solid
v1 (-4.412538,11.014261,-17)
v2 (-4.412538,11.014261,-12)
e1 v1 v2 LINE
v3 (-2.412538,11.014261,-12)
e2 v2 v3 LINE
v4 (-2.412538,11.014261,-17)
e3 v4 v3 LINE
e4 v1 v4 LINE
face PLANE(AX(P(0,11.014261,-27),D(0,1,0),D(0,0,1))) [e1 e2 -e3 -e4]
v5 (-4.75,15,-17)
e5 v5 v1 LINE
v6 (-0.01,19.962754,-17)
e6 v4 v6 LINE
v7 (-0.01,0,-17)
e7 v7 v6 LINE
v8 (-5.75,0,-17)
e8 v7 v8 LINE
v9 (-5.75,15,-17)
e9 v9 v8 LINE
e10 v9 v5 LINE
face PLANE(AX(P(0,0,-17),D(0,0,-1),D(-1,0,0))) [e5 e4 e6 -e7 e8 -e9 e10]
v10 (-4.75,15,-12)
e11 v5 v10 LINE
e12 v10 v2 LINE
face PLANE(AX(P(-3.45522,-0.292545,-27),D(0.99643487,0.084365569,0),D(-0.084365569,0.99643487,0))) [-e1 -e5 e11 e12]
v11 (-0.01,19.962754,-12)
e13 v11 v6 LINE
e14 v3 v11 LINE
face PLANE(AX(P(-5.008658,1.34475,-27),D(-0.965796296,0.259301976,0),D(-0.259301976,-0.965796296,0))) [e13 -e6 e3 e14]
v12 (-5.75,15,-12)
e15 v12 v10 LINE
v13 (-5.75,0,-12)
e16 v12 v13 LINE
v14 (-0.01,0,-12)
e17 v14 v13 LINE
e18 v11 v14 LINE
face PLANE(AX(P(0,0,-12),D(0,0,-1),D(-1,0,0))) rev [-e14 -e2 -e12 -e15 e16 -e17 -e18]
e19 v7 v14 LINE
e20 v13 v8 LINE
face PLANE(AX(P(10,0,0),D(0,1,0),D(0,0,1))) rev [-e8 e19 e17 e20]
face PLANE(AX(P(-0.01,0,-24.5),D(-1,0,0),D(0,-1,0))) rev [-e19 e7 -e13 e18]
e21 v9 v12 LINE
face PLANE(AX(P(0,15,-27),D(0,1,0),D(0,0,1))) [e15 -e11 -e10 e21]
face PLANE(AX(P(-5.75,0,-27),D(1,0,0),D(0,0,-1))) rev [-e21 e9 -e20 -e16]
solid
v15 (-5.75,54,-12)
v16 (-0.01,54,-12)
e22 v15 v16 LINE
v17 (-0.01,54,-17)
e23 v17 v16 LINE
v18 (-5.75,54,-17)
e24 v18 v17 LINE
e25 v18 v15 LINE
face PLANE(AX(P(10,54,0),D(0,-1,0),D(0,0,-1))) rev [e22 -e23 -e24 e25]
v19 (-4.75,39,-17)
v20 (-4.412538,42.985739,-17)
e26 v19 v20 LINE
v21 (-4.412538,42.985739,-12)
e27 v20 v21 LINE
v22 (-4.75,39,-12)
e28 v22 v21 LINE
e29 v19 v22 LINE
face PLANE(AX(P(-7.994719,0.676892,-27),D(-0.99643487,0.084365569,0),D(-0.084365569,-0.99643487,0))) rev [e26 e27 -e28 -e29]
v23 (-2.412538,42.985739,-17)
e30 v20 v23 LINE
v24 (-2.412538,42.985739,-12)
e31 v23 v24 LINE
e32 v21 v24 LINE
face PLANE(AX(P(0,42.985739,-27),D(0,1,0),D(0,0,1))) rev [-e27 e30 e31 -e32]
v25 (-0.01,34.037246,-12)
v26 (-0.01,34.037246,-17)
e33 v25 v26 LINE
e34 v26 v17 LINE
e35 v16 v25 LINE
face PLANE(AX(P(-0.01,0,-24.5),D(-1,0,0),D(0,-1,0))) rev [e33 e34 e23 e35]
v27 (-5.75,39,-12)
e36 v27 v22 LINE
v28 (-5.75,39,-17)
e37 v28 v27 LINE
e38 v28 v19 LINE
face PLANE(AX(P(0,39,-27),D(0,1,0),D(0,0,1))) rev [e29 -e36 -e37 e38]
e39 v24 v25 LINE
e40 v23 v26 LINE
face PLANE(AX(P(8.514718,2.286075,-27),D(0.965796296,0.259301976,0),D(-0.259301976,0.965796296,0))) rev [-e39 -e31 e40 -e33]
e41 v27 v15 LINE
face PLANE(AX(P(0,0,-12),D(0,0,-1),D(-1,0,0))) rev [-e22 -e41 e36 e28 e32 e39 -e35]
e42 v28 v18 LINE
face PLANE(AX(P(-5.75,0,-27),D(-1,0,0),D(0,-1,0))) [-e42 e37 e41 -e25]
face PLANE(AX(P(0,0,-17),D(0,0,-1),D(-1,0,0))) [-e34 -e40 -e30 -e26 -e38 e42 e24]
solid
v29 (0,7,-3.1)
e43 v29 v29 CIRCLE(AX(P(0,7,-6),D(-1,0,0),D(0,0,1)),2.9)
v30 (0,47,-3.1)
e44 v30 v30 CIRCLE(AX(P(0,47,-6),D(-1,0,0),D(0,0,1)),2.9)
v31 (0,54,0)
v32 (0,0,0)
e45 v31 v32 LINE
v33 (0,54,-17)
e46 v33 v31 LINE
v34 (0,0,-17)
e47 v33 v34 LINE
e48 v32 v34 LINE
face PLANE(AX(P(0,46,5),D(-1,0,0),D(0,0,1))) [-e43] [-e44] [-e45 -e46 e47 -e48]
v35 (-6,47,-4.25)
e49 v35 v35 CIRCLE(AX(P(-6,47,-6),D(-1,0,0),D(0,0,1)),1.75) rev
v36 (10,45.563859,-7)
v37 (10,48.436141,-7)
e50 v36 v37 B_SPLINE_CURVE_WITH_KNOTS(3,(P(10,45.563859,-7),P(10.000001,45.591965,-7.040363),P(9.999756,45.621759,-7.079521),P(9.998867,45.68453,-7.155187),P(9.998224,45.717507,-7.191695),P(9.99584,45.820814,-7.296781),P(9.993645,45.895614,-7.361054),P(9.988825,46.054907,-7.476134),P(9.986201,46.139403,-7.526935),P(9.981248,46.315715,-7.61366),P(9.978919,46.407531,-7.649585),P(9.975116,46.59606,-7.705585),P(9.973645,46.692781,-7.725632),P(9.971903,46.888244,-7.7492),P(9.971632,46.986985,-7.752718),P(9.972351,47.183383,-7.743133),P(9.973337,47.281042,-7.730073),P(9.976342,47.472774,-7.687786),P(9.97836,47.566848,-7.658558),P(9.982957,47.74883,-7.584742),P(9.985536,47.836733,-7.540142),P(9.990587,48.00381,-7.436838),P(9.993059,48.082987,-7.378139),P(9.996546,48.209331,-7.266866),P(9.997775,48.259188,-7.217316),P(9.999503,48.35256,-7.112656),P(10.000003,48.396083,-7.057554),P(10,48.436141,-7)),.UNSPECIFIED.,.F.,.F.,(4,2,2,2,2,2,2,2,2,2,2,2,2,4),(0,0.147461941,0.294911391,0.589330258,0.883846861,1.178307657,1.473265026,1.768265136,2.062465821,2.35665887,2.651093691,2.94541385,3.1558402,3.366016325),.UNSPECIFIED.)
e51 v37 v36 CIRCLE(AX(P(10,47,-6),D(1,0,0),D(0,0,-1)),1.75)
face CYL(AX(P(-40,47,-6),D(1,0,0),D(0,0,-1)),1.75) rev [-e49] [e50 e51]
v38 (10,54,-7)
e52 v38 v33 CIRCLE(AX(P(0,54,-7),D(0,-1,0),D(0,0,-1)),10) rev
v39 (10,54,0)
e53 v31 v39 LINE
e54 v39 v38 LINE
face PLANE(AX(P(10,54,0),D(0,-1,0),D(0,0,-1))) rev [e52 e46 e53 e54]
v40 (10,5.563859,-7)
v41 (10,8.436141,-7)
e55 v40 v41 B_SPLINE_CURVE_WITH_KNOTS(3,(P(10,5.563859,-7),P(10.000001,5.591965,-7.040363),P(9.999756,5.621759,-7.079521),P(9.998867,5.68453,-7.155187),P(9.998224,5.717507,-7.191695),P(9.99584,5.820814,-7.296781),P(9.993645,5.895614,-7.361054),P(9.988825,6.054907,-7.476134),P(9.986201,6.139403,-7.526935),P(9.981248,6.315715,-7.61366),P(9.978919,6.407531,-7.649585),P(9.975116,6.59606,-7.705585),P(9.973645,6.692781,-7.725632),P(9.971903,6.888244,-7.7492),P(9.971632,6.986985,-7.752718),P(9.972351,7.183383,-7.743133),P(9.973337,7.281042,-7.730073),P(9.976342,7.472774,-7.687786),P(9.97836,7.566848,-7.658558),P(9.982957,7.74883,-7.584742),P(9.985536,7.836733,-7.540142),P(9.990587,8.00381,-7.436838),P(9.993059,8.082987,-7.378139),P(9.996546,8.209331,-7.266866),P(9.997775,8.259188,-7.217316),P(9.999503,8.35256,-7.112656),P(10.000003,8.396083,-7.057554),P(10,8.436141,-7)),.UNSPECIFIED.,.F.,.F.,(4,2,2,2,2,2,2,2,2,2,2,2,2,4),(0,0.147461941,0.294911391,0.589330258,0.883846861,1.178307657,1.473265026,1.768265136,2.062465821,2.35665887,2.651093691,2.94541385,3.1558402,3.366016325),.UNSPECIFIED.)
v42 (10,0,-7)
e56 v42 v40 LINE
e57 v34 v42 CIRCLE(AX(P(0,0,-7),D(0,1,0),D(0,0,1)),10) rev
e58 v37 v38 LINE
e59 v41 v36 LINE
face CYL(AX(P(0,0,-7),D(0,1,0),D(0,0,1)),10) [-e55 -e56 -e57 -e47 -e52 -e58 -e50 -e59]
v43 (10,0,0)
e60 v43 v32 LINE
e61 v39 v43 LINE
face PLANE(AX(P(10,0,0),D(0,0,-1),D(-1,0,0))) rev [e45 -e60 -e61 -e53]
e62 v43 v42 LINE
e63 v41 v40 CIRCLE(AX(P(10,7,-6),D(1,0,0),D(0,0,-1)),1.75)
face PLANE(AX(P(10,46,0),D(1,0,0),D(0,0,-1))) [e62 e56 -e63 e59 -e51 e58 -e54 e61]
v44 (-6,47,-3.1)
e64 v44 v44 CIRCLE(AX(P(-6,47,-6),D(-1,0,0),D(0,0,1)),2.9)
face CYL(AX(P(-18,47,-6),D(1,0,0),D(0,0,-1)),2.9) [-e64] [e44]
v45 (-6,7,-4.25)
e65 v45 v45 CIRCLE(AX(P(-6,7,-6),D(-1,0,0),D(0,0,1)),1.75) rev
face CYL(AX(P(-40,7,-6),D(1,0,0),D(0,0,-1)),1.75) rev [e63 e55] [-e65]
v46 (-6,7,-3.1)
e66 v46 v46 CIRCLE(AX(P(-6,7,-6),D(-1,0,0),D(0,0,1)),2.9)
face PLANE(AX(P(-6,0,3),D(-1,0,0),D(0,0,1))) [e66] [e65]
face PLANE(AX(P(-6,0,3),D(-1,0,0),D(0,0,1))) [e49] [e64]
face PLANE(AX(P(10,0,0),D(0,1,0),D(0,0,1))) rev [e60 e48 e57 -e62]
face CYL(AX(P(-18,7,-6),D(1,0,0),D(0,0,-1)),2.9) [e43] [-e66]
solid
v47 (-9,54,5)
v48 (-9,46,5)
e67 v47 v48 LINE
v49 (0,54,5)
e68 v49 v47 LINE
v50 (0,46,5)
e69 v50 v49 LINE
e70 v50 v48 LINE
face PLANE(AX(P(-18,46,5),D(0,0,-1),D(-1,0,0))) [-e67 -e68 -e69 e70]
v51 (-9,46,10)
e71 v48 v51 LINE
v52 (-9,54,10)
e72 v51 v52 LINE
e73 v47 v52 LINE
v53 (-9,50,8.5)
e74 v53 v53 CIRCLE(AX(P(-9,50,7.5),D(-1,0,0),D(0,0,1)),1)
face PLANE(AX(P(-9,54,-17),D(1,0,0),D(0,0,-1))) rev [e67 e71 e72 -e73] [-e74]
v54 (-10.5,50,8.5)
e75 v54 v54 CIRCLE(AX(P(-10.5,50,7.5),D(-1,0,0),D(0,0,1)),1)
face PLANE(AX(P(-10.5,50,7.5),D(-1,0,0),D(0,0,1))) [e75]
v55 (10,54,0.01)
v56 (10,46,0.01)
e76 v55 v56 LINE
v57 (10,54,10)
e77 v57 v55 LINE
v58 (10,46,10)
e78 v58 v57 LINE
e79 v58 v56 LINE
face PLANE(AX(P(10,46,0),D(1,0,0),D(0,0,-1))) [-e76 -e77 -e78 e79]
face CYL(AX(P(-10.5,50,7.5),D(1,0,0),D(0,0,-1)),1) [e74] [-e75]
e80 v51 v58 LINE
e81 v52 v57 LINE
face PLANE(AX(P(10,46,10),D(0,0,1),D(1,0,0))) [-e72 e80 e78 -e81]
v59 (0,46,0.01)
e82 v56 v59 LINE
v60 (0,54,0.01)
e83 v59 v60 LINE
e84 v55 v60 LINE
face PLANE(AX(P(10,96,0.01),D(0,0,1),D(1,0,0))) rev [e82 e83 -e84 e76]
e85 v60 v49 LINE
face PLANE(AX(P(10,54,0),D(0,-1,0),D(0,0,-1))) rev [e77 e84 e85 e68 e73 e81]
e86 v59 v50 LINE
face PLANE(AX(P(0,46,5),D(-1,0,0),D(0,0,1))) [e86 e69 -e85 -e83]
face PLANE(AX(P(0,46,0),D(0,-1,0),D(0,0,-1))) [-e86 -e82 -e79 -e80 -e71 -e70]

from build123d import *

# Parameters (mm, degrees)
SKETCH1_W               = 12
SKETCH1_H               = 54
BOSS_EXTRUDE1_DEPTH     = 10
SKETCH2_R               = 2.9
BOSS_EXTRUDE2_DEPTH     = 18
SKETCH3_W               = 12
SKETCH3_H               = 54
BOSS_EXTRUDE3_DEPTH     = 10
SKETCH4_R               = 1.75
CUT_EXTRUDE1_DEPTH      = 50
SKETCH5_W               = 38
SKETCH5_H               = 54
BOSS_EXTRUDE4_DEPTH     = 5
FILLET1_R               = 10
SKETCH6_W               = 6
SKETCH6_H               = 54
CUT_EXTRUDE2_DEPTH      = 15
SKETCH7_W               = 0.01
SKETCH7_H               = 54
CUT_EXTRUDE3_DEPTH      = 12.5
BOSS_EXTRUDE5_DEPTH     = 8
SKETCH9_W               = 38
SKETCH9_H               = 0.01
CUT_EXTRUDE4_DEPTH      = 50
SKETCH10_W              = 11
SKETCH10_H              = 54
BOSS_EXTRUDE6_DEPTH     = 2.5
BOSS_EXTRUDE7_DEPTH     = 54
CUT_EXTRUDE5_DEPTH      = 10
CUT_EXTRUDE5_DEPTH_BACK = 5
CUT_EXTRUDE6_DEPTH      = 67.550732692
CUT_EXTRUDE6_DEPTH_BACK = 67.550732692
SKETCH15_W              = 34.984132004
SKETCH15_H              = 56.27391211
SKETCH16_R              = 1
BOSS_EXTRUDE8_DEPTH     = 1.5


with BuildPart() as part:
    # Sketch1 → Boss-Extrude1 (new body)
    with BuildSketch(Plane(origin=(0, 0, 0), x_dir=(0, 0, -1), z_dir=(1, 0, 0))):
        with Locations((6, 27)):
            Rectangle(SKETCH1_W, SKETCH1_H)
    extrude(amount=BOSS_EXTRUDE1_DEPTH)

    # Sketch2 → Boss-Extrude2 (add)
    with BuildSketch(Plane.ZY):
        with Locations((-6, 47)):
            Circle(SKETCH2_R)
        with Locations((-6, 7)):
            Circle(SKETCH2_R)
    extrude(amount=BOSS_EXTRUDE2_DEPTH)

    # Sketch3 → Boss-Extrude3 (add)
    with BuildSketch(Plane.ZY.offset(18)):
        with Locations((-6, 27)):
            Rectangle(SKETCH3_W, SKETCH3_H)
    extrude(amount=BOSS_EXTRUDE3_DEPTH)

    # Sketch4 → Cut-Extrude1 (cut)
    with BuildSketch(Plane(origin=(10, 0, 0), x_dir=(0, 0, -1), z_dir=(1, 0, 0))):
        with Locations((6, 47)):
            Circle(SKETCH4_R)
        with Locations((6, 7)):
            Circle(SKETCH4_R)
    extrude(amount=-CUT_EXTRUDE1_DEPTH, mode=Mode.SUBTRACT)

    # Sketch5 → Boss-Extrude4 (add)
    with BuildSketch(Plane(origin=(0, 0, -12), x_dir=(-1, 0, 0), z_dir=(0, 0, -1))):
        with Locations((9, 27)):
            Rectangle(SKETCH5_W, SKETCH5_H)
    extrude(amount=BOSS_EXTRUDE4_DEPTH)

    # Fillet1
    # the kernel refuses this fillet: 10 mm, written as the material it takes off along each edge
    with BuildSketch(Plane(origin=(10, -25, -17), x_dir=(-1, 0, 0), z_dir=(0, 1, 0))) as fillet1_piece_1:
        with BuildLine():
            CenterArc((FILLET1_R, FILLET1_R), FILLET1_R, 180, 90)
            Line((0, FILLET1_R), (0, 0))
            Line((0, 0), (FILLET1_R, 0))
        make_face()
    extrude(amount=104, mode=Mode.SUBTRACT)
    with BuildSketch(Plane(origin=(-28, 79, -17), x_dir=(0, 0, 1), z_dir=(0, -1, 0))) as fillet1_piece_2:
        with BuildLine():
            CenterArc((FILLET1_R, -FILLET1_R), FILLET1_R, 90, 90)
            Line((0, -FILLET1_R), (0, 0))
            Line((0, 0), (FILLET1_R, 0))
        make_face()
    extrude(amount=104, mode=Mode.SUBTRACT)

    # Sketch6 → Cut-Extrude2 (cut)
    with BuildSketch(Plane.XY.offset(-12)):
        with Locations((-9, 27)):
            Rectangle(SKETCH6_W, SKETCH6_H)
    extrude(amount=CUT_EXTRUDE2_DEPTH, mode=Mode.SUBTRACT)

    # Sketch7 → Cut-Extrude3 (cut)
    with BuildSketch(Plane.XY.offset(-12)):
        with Locations((-17.995, 27)):
            Rectangle(SKETCH7_W, SKETCH7_H)
        with Locations((-0.005, 27)):
            Rectangle(SKETCH7_W, SKETCH7_H)
    extrude(amount=-CUT_EXTRUDE3_DEPTH, mode=Mode.SUBTRACT)


with BuildPart() as cut_extrude3_piece_1:
    # of the separate pieces the step leaves, piece 1, a body of its own (cut_extrude3_pieces)
    add(part.part.solids().sort_by_distance((-18, 0, 0))[0])



with BuildPart() as cut_extrude3_piece_2:
    # of the separate pieces the step leaves, piece 2, a body of its own (cut_extrude3_pieces)
    add(part.part.solids().sort_by_distance((0, 0, -17))[0])


with BuildPart() as cut_extrude3_piece_3:
    # of the separate pieces the step leaves, piece 3, a body of its own (cut_extrude3_pieces)
    add(part.part.solids().sort_by_distance((-17.99, 0, -12))[0])



with BuildPart() as cut_extrude3_piece_1_1:
    add(cut_extrude3_piece_1.part)

    add(cut_extrude3_piece_2.part)  # Boss-Extrude5 merges Cut-Extrude3 piece 2
    # Sketch8 → Boss-Extrude5 (add)
    with BuildSketch(Plane(origin=(0, 54, 0), x_dir=(1, 0, 0), z_dir=(0, 1, 0))):
        Polygon((-18, 0), (-18, -5), (0, -5), (0, 0), (10, 0), (10, -10), (-28, -10), (-28, 0), align=None)
    extrude(amount=-BOSS_EXTRUDE5_DEPTH)

    # Sketch9 → Cut-Extrude4 (cut)
    with BuildSketch(Plane.XZ.offset(-46)):
        with Locations((-9, 0.005)):
            Rectangle(SKETCH9_W, SKETCH9_H)
    extrude(amount=-CUT_EXTRUDE4_DEPTH, mode=Mode.SUBTRACT)


with BuildPart() as cut_extrude4_piece_1:
    # of the separate pieces the step leaves, piece 1, a body of its own (cut_extrude4_pieces)
    add(cut_extrude3_piece_1_1.part.solids().sort_by_distance((0, 0, -17))[0])


with BuildPart() as cut_extrude4_piece_2:
    # of the separate pieces the step leaves, piece 2, a body of its own (cut_extrude4_pieces)
    add(cut_extrude3_piece_1_1.part.solids().sort_by_distance((-18, 0, 0))[0])


with BuildPart() as cut_extrude4_piece_3:
    # of the separate pieces the step leaves, piece 3, a body of its own (cut_extrude4_pieces)
    add(cut_extrude3_piece_1_1.part.solids().sort_by_distance((0, 54, 0.01))[0])


with BuildPart() as cut_extrude3_piece_3_1:
    add(cut_extrude3_piece_3.part)

    add(cut_extrude4_piece_2.part)  # Boss-Extrude6 merges Cut-Extrude4 piece 2
    # Sketch10 → Boss-Extrude6 (add)
    with BuildSketch(Plane(origin=(0, 0, -17), x_dir=(-1, 0, 0), z_dir=(0, 0, -1))):
        with Locations((12.5, 27)):
            Rectangle(SKETCH10_W, SKETCH10_H)
    extrude(amount=BOSS_EXTRUDE6_DEPTH)

    # Sketch11 → Boss-Extrude7 (add)
    with BuildSketch(Plane(origin=(0, 54, 0), x_dir=(1, 0, 0), z_dir=(0, 1, 0))):
        Polygon((-18, 18.25), (-19.25, 19.5), (-18, 19.5), align=None)
        Polygon((-7, 19.5), (-7, 18.25), (-5.75, 19.5), align=None)
    extrude(amount=-BOSS_EXTRUDE7_DEPTH)

    # Sketch13 → Cut-Extrude5 (cut, two sides: drawn at the far end of the back side and taken through both)
    with BuildSketch(Plane(origin=(0, 0, -17), x_dir=(-1, 0, 0), z_dir=(0, 0, -1)).offset(-CUT_EXTRUDE5_DEPTH_BACK)):
        Polygon((34.299684683, 54), (7, 54), (7, 0), (5.75, 0), (5.75, -4.476290179), (34.299684683, -4.476290179), align=None)
        Polygon((7, 54), (5.75, 54), (5.75, 39), (4.75, 39), (4.412537726, 42.985739481), (2.412537726, 42.985739481), (0.01, 34.037246006), (0.01, 19.962753994), (2.412537726, 11.014260519), (4.412537726, 11.014260519), (4.75, 15), (5.75, 15), (5.75, 0), (7, 0), align=None)
    extrude(amount=CUT_EXTRUDE5_DEPTH + CUT_EXTRUDE5_DEPTH_BACK, mode=Mode.SUBTRACT)


with BuildPart() as cut_extrude6_tool:
    # Sketch15 → Cut-Extrude6 (new, two sides: drawn at the far end of the back side and taken through both)
    with BuildSketch(Plane.XY.offset(10).offset(-CUT_EXTRUDE6_DEPTH_BACK)):
        with Locations((-26.492066002, 25.863043945)):
            Rectangle(SKETCH15_W, SKETCH15_H)
    extrude(amount=CUT_EXTRUDE6_DEPTH + CUT_EXTRUDE6_DEPTH_BACK)


with BuildPart() as cut_extrude3_piece_3_2:
    add(cut_extrude3_piece_3_1.part)

    # Cut-Extrude6: cut by cut_extrude6_tool
    add(cut_extrude6_tool.part, mode=Mode.SUBTRACT)


with BuildPart() as cut_extrude4_piece_3_1:
    add(cut_extrude4_piece_3.part)

    # Cut-Extrude6: cut by cut_extrude6_tool
    add(cut_extrude6_tool.part, mode=Mode.SUBTRACT)

    # Sketch16 → Boss-Extrude8 (add)
    with BuildSketch(Plane.ZY.offset(9)):
        with Locations((7.5, 50)):
            Circle(SKETCH16_R)
    extrude(amount=BOSS_EXTRUDE8_DEPTH)


solid = Compound([cut_extrude4_piece_1.part, cut_extrude3_piece_3_2.part, cut_extrude4_piece_3_1.part])
